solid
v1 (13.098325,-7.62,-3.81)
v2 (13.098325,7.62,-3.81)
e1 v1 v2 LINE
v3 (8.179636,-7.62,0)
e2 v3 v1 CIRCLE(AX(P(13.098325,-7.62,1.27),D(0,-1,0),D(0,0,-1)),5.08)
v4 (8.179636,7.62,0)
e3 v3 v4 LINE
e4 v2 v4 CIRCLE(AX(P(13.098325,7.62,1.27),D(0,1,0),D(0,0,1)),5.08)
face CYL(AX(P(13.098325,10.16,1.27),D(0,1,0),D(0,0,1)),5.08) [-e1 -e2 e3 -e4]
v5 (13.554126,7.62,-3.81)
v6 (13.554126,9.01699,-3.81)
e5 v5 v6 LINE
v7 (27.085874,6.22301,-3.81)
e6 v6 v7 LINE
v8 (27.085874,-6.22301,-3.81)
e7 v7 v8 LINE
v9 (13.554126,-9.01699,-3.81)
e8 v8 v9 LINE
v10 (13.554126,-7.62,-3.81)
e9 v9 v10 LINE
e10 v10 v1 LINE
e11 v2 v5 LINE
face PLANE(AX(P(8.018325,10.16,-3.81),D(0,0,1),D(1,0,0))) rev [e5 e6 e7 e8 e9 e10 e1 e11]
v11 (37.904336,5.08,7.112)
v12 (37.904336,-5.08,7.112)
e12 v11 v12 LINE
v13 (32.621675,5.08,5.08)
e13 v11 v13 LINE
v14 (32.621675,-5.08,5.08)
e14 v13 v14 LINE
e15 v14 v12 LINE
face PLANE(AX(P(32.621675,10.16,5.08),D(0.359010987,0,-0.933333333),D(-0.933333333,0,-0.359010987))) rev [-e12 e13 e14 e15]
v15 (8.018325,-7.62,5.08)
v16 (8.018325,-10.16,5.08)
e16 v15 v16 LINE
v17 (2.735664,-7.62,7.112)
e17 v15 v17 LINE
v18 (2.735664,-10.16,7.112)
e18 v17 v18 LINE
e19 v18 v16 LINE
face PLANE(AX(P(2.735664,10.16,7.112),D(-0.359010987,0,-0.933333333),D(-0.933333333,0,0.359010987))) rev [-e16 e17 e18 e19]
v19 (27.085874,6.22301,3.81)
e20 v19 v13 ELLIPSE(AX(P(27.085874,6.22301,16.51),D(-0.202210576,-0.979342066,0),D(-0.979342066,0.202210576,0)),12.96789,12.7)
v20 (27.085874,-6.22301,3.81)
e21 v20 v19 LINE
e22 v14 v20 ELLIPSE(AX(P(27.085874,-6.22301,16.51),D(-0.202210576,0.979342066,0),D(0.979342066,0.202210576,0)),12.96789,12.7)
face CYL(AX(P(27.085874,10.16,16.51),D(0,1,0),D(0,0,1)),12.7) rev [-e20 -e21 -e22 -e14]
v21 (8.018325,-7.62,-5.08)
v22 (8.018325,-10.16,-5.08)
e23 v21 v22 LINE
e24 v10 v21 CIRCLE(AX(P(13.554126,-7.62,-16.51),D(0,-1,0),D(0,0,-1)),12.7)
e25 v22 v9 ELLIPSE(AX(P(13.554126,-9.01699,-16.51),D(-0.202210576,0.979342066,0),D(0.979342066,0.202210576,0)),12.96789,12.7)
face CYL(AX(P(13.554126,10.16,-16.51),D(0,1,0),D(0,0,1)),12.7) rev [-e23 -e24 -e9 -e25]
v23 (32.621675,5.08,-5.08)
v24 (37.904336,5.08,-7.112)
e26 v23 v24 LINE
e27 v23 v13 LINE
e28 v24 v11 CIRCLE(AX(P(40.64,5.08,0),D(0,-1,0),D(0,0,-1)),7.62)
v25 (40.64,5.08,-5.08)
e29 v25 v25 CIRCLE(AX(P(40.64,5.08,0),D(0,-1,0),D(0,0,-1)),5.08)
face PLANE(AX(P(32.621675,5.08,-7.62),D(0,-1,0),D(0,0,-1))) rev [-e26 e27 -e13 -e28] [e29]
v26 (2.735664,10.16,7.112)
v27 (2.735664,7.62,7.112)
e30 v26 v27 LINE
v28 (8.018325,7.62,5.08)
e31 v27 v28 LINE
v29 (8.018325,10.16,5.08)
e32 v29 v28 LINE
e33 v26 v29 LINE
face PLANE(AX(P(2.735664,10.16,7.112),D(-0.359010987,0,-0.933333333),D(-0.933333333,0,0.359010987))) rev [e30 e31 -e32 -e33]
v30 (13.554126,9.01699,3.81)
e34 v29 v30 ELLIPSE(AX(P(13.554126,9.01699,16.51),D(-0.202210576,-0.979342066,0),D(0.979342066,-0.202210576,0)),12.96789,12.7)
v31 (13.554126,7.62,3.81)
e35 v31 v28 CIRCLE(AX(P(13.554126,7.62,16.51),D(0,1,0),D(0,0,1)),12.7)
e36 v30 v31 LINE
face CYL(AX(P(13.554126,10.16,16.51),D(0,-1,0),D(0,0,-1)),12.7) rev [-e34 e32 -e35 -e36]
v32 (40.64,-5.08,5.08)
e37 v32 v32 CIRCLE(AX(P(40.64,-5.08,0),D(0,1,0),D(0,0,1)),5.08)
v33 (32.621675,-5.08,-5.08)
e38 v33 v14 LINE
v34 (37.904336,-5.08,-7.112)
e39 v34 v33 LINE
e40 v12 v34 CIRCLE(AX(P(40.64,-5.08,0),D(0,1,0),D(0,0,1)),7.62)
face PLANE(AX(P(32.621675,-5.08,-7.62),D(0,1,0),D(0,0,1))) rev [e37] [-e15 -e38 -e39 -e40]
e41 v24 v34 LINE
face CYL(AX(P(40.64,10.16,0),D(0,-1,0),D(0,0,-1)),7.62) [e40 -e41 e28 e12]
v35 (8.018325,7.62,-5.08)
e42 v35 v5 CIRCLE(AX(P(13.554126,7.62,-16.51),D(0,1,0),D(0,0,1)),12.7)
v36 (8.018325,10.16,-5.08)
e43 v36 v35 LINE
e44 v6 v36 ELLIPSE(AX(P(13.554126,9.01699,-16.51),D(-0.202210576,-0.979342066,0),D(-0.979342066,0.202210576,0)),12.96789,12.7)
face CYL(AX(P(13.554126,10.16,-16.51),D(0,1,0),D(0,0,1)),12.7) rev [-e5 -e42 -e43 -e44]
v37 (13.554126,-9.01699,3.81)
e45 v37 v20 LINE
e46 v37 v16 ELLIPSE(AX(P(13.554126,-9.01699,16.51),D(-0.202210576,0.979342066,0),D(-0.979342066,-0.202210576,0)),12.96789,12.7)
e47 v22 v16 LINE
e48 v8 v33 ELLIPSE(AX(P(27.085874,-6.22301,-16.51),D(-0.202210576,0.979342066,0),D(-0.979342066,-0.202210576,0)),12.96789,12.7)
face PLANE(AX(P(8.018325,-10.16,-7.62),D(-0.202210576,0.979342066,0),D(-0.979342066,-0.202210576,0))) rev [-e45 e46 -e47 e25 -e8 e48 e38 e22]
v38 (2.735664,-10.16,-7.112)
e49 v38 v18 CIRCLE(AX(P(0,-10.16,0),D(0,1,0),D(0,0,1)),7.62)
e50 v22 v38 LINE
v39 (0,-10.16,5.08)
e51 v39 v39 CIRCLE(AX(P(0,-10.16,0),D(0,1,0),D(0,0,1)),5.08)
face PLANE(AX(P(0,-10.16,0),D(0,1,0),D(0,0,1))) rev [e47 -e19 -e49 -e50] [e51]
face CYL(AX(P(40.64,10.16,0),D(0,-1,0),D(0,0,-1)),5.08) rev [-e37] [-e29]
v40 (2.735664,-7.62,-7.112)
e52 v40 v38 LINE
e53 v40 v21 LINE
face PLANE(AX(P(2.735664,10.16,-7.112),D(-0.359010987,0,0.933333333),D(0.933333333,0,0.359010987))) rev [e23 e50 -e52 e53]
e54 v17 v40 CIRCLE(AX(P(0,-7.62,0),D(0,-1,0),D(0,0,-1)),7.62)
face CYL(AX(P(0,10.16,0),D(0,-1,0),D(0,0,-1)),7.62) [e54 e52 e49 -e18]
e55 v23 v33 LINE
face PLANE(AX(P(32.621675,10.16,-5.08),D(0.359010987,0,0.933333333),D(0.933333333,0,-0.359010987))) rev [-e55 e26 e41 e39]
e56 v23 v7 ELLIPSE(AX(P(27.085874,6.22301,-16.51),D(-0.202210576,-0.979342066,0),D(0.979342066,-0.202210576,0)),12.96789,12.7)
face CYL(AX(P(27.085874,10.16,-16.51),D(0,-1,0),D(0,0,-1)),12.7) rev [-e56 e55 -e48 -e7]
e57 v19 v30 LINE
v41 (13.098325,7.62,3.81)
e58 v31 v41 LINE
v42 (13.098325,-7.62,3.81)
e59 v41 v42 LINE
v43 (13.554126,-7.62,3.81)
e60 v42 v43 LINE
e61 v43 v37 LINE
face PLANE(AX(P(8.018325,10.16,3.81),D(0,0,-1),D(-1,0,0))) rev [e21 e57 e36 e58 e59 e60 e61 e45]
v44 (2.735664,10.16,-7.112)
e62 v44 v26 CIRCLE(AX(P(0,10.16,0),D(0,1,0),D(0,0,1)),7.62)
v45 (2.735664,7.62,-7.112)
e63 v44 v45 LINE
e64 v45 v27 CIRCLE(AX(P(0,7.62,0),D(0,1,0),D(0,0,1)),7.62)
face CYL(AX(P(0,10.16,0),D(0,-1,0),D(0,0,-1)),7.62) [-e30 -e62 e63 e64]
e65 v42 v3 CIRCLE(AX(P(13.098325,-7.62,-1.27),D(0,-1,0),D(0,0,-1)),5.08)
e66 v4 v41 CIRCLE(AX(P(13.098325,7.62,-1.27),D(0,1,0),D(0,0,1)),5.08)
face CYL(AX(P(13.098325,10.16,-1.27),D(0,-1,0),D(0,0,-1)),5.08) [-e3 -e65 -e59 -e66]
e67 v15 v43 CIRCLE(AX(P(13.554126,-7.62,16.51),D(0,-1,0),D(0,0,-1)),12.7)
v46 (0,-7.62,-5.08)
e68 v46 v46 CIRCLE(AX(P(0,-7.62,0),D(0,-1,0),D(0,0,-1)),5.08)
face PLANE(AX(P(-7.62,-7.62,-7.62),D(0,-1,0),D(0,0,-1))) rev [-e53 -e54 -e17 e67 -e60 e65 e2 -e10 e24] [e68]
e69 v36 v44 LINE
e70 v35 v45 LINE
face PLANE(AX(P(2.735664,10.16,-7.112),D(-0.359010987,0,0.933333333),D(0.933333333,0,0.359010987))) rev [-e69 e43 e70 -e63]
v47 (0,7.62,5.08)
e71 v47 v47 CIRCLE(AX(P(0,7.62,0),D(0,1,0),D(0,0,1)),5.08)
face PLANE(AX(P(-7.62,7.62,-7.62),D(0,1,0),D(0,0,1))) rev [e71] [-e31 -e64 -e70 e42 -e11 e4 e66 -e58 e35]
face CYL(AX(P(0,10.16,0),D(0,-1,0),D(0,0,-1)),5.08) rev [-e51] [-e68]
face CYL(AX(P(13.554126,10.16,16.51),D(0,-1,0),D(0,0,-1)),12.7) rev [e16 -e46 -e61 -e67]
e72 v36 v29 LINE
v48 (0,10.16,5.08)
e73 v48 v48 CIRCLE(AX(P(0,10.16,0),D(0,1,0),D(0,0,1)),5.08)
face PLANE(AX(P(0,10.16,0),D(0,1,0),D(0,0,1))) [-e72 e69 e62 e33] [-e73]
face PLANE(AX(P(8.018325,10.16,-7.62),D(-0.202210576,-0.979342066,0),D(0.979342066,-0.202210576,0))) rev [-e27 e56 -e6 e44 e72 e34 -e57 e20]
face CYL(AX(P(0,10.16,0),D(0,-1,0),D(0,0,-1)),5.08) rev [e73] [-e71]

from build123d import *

# Parameters (mm, degrees)
SKETCH1_R           = 5.08
BOSS_EXTRUDE1_DEPTH = 10.16
SKETCH2_W           = 15.638324702
SKETCH2_H           = 15.24
CUT_EXTRUDE1_DEPTH  = 54.836616721
FILLET1_R           = 12.7
FILLET2_R           = 5.08


with BuildPart() as part:
    # Sketch1 → Boss-Extrude1 (new, symmetric)
    with BuildSketch(Plane(origin=(0, 0, 0), x_dir=(1, 0, 0), z_dir=(0, 1, 0))):
        with BuildLine():
            Line((2.735663722, 7.112), (8.018324702, 5.08))
            Line((8.018324702, 5.08), (8.018324702, 3.81))
            Line((8.018324702, 3.81), (32.621675298, 3.81))
            Line((32.621675298, 3.81), (32.621675298, 5.08))
            Line((32.621675298, 5.08), (37.904336278, 7.112))
            ThreePointArc((37.904336278, 7.112), (48.26, 0), (37.904336278, -7.112))
            Line((37.904336278, -7.112), (32.621675298, -5.08))
            Line((32.621675298, -5.08), (32.621675298, -3.81))
            Line((32.621675298, -3.81), (8.018324702, -3.81))
            Line((8.018324702, -3.81), (8.018324702, -5.08))
            Line((8.018324702, -5.08), (2.735663722, -7.112))
            ThreePointArc((2.735663722, -7.112), (-7.62, 0), (2.735663722, 7.112))
        make_face()
        with Locations(Location((0, 0, 0), (0, 0, 270))):
            Circle(SKETCH1_R, mode=Mode.SUBTRACT)
        with Locations(Location((40.64, 0, 0), (0, 0, 270))):
            Circle(SKETCH1_R, mode=Mode.SUBTRACT)
    extrude(amount=BOSS_EXTRUDE1_DEPTH, both=True)

    # Sketch2 → Cut-Extrude1 (cut, through all)
    with BuildSketch(Plane.XY.offset(13.97)):
        Polygon((8.018324702, 10.16), (32.621675298, 5.08), (48.26, 5.08), (48.26, 10.16), align=None)
        with Locations((0.199162351, 0)):
            Rectangle(SKETCH2_W, SKETCH2_H)
        Polygon((48.26, -10.16), (48.26, -5.08), (32.621675298, -5.08), (8.018324702, -10.16), align=None)
    extrude(amount=-CUT_EXTRUDE1_DEPTH, mode=Mode.SUBTRACT)

    # Fillet1
    # the kernel refuses this fillet: 12.7 mm, written as the material it adds along each edge
    with BuildSketch(Plane(origin=(32.621675298, 18.919504146, 3.81), x_dir=(-1, 0, 0), z_dir=(0, -1, 0))) as fillet1_piece_1_section:
        with BuildLine():
            CenterArc((5.535801658, -12.7), FILLET1_R, 90, 25.841932763)
            Line((0, -1.27), (0, 0))
            Line((0, 0), (5.535801658, 0))
        make_face()
    fillet1_piece_1 = extrude(amount=37.839008291, mode=Mode.PRIVATE)
    fillet1_piece_1 = split(fillet1_piece_1, bisect_by=Plane(origin=(37.374376864, -4.098681465, 3.81), z_dir=(-0.20221057606968723, 0.9793420663514691, 0)), keep=Keep.TOP, mode=Mode.PRIVATE)
    fillet1_piece_1 = split(fillet1_piece_1, bisect_by=Plane(origin=(29.880992297, 5.645885105, 3.81), z_dir=(-0.20221057606968723, -0.9793420663514691, 0)), keep=Keep.TOP, mode=Mode.PRIVATE)
    add(fillet1_piece_1)
    with BuildSketch(Plane(origin=(32.621675298, 18.919504146, -3.81), x_dir=(-1, 0, 0), z_dir=(0, -1, 0))) as fillet1_piece_2_section:
        with BuildLine():
            CenterArc((5.535801658, 12.7), FILLET1_R, 244.158067237, 25.841932763)
            Line((0, 1.27), (0, 0))
            Line((0, 0), (5.535801658, 0))
        make_face()
    fillet1_piece_2 = extrude(amount=37.839008291, mode=Mode.PRIVATE)
    fillet1_piece_2 = split(fillet1_piece_2, bisect_by=Plane(origin=(37.374376864, -4.098681465, -3.81), z_dir=(-0.20221057606968723, 0.9793420663514691, 0)), keep=Keep.TOP, mode=Mode.PRIVATE)
    fillet1_piece_2 = split(fillet1_piece_2, bisect_by=Plane(origin=(29.880992297, 5.645885105, -3.81), z_dir=(-0.20221057606968723, -0.9793420663514691, 0)), keep=Keep.TOP, mode=Mode.PRIVATE)
    add(fillet1_piece_2)
    with BuildSketch(Plane(origin=(8.018324702, -7.62, -3.81), x_dir=(1, 0, 0), z_dir=(0, -1, 0))) as fillet1_piece_3_section:
        with BuildLine():
            CenterArc((5.535801658, -12.7), FILLET1_R, 90, 25.841932763)
            Line((0, -1.27), (0, 0))
            Line((0, 0), (5.535801658, 0))
        make_face()
    fillet1_piece_3 = extrude(amount=16.379504146, mode=Mode.PRIVATE)
    fillet1_piece_3 = split(fillet1_piece_3, bisect_by=Plane(origin=(8.521329344, -10.056141643, -3.81), z_dir=(-0.20221057606968723, 0.9793420663514691, 0)), keep=Keep.TOP, mode=Mode.PRIVATE)
    add(fillet1_piece_3)
    with BuildSketch(Plane(origin=(8.018324702, 23.999504146, -3.81), x_dir=(1, 0, 0), z_dir=(0, -1, 0))) as fillet1_piece_4_section:
        with BuildLine():
            CenterArc((5.535801658, -12.7), FILLET1_R, 90, 25.841932763)
            Line((0, -1.27), (0, 0))
            Line((0, 0), (5.535801658, 0))
        make_face()
    fillet1_piece_4 = extrude(amount=16.379504146, mode=Mode.PRIVATE)
    fillet1_piece_4 = split(fillet1_piece_4, bisect_by=Plane(origin=(5.277641702, 10.725885105, -3.81), z_dir=(-0.20221057606968723, -0.9793420663514691, 0)), keep=Keep.TOP, mode=Mode.PRIVATE)
    add(fillet1_piece_4)
    with BuildSketch(Plane(origin=(8.018324702, -7.62, 3.81), x_dir=(0, 0, 1), z_dir=(0, -1, 0))) as fillet1_piece_5_section:
        with BuildLine():
            CenterArc((12.7, -5.535801658), FILLET1_R, 154.158067237, 25.841932763)
            Line((0, -5.535801658), (0, 0))
            Line((0, 0), (1.27, 0))
        make_face()
    fillet1_piece_5 = extrude(amount=16.379504146, mode=Mode.PRIVATE)
    fillet1_piece_5 = split(fillet1_piece_5, bisect_by=Plane(origin=(8.521329344, -10.056141643, 3.81), z_dir=(-0.20221057606968723, 0.9793420663514691, 0)), keep=Keep.TOP, mode=Mode.PRIVATE)
    add(fillet1_piece_5)
    with BuildSketch(Plane(origin=(8.018324702, 23.999504146, 3.81), x_dir=(0, 0, 1), z_dir=(0, -1, 0))) as fillet1_piece_6_section:
        with BuildLine():
            CenterArc((12.7, -5.535801658), FILLET1_R, 154.158067237, 25.841932763)
            Line((0, -5.535801658), (0, 0))
            Line((0, 0), (1.27, 0))
        make_face()
    fillet1_piece_6 = extrude(amount=16.379504146, mode=Mode.PRIVATE)
    fillet1_piece_6 = split(fillet1_piece_6, bisect_by=Plane(origin=(5.277641702, 10.725885105, 3.81), z_dir=(-0.20221057606968723, -0.9793420663514691, 0)), keep=Keep.TOP, mode=Mode.PRIVATE)
    add(fillet1_piece_6)

    # Fillet2
    # the kernel refuses this fillet: 5.08 mm, written as the material it takes off along each edge
    with BuildSketch(Plane(origin=(8.018324702, 7.62, -3.81), x_dir=(1, 0, 0), z_dir=(0, -1, 0)), Plane(origin=(8.018324702, 7.62, 3.81), x_dir=(0, 0, -1), z_dir=(0, -1, 0))) as fillet2_piece_1:
        with BuildLine():
            CenterArc((FILLET2_R, FILLET2_R), FILLET2_R, 180, 90)
            Line((0, FILLET2_R), (0, 0))
            Line((0, 0), (FILLET2_R, 0))
        make_face()
    extrude(amount=15.24, mode=Mode.SUBTRACT)


solid = part.part
